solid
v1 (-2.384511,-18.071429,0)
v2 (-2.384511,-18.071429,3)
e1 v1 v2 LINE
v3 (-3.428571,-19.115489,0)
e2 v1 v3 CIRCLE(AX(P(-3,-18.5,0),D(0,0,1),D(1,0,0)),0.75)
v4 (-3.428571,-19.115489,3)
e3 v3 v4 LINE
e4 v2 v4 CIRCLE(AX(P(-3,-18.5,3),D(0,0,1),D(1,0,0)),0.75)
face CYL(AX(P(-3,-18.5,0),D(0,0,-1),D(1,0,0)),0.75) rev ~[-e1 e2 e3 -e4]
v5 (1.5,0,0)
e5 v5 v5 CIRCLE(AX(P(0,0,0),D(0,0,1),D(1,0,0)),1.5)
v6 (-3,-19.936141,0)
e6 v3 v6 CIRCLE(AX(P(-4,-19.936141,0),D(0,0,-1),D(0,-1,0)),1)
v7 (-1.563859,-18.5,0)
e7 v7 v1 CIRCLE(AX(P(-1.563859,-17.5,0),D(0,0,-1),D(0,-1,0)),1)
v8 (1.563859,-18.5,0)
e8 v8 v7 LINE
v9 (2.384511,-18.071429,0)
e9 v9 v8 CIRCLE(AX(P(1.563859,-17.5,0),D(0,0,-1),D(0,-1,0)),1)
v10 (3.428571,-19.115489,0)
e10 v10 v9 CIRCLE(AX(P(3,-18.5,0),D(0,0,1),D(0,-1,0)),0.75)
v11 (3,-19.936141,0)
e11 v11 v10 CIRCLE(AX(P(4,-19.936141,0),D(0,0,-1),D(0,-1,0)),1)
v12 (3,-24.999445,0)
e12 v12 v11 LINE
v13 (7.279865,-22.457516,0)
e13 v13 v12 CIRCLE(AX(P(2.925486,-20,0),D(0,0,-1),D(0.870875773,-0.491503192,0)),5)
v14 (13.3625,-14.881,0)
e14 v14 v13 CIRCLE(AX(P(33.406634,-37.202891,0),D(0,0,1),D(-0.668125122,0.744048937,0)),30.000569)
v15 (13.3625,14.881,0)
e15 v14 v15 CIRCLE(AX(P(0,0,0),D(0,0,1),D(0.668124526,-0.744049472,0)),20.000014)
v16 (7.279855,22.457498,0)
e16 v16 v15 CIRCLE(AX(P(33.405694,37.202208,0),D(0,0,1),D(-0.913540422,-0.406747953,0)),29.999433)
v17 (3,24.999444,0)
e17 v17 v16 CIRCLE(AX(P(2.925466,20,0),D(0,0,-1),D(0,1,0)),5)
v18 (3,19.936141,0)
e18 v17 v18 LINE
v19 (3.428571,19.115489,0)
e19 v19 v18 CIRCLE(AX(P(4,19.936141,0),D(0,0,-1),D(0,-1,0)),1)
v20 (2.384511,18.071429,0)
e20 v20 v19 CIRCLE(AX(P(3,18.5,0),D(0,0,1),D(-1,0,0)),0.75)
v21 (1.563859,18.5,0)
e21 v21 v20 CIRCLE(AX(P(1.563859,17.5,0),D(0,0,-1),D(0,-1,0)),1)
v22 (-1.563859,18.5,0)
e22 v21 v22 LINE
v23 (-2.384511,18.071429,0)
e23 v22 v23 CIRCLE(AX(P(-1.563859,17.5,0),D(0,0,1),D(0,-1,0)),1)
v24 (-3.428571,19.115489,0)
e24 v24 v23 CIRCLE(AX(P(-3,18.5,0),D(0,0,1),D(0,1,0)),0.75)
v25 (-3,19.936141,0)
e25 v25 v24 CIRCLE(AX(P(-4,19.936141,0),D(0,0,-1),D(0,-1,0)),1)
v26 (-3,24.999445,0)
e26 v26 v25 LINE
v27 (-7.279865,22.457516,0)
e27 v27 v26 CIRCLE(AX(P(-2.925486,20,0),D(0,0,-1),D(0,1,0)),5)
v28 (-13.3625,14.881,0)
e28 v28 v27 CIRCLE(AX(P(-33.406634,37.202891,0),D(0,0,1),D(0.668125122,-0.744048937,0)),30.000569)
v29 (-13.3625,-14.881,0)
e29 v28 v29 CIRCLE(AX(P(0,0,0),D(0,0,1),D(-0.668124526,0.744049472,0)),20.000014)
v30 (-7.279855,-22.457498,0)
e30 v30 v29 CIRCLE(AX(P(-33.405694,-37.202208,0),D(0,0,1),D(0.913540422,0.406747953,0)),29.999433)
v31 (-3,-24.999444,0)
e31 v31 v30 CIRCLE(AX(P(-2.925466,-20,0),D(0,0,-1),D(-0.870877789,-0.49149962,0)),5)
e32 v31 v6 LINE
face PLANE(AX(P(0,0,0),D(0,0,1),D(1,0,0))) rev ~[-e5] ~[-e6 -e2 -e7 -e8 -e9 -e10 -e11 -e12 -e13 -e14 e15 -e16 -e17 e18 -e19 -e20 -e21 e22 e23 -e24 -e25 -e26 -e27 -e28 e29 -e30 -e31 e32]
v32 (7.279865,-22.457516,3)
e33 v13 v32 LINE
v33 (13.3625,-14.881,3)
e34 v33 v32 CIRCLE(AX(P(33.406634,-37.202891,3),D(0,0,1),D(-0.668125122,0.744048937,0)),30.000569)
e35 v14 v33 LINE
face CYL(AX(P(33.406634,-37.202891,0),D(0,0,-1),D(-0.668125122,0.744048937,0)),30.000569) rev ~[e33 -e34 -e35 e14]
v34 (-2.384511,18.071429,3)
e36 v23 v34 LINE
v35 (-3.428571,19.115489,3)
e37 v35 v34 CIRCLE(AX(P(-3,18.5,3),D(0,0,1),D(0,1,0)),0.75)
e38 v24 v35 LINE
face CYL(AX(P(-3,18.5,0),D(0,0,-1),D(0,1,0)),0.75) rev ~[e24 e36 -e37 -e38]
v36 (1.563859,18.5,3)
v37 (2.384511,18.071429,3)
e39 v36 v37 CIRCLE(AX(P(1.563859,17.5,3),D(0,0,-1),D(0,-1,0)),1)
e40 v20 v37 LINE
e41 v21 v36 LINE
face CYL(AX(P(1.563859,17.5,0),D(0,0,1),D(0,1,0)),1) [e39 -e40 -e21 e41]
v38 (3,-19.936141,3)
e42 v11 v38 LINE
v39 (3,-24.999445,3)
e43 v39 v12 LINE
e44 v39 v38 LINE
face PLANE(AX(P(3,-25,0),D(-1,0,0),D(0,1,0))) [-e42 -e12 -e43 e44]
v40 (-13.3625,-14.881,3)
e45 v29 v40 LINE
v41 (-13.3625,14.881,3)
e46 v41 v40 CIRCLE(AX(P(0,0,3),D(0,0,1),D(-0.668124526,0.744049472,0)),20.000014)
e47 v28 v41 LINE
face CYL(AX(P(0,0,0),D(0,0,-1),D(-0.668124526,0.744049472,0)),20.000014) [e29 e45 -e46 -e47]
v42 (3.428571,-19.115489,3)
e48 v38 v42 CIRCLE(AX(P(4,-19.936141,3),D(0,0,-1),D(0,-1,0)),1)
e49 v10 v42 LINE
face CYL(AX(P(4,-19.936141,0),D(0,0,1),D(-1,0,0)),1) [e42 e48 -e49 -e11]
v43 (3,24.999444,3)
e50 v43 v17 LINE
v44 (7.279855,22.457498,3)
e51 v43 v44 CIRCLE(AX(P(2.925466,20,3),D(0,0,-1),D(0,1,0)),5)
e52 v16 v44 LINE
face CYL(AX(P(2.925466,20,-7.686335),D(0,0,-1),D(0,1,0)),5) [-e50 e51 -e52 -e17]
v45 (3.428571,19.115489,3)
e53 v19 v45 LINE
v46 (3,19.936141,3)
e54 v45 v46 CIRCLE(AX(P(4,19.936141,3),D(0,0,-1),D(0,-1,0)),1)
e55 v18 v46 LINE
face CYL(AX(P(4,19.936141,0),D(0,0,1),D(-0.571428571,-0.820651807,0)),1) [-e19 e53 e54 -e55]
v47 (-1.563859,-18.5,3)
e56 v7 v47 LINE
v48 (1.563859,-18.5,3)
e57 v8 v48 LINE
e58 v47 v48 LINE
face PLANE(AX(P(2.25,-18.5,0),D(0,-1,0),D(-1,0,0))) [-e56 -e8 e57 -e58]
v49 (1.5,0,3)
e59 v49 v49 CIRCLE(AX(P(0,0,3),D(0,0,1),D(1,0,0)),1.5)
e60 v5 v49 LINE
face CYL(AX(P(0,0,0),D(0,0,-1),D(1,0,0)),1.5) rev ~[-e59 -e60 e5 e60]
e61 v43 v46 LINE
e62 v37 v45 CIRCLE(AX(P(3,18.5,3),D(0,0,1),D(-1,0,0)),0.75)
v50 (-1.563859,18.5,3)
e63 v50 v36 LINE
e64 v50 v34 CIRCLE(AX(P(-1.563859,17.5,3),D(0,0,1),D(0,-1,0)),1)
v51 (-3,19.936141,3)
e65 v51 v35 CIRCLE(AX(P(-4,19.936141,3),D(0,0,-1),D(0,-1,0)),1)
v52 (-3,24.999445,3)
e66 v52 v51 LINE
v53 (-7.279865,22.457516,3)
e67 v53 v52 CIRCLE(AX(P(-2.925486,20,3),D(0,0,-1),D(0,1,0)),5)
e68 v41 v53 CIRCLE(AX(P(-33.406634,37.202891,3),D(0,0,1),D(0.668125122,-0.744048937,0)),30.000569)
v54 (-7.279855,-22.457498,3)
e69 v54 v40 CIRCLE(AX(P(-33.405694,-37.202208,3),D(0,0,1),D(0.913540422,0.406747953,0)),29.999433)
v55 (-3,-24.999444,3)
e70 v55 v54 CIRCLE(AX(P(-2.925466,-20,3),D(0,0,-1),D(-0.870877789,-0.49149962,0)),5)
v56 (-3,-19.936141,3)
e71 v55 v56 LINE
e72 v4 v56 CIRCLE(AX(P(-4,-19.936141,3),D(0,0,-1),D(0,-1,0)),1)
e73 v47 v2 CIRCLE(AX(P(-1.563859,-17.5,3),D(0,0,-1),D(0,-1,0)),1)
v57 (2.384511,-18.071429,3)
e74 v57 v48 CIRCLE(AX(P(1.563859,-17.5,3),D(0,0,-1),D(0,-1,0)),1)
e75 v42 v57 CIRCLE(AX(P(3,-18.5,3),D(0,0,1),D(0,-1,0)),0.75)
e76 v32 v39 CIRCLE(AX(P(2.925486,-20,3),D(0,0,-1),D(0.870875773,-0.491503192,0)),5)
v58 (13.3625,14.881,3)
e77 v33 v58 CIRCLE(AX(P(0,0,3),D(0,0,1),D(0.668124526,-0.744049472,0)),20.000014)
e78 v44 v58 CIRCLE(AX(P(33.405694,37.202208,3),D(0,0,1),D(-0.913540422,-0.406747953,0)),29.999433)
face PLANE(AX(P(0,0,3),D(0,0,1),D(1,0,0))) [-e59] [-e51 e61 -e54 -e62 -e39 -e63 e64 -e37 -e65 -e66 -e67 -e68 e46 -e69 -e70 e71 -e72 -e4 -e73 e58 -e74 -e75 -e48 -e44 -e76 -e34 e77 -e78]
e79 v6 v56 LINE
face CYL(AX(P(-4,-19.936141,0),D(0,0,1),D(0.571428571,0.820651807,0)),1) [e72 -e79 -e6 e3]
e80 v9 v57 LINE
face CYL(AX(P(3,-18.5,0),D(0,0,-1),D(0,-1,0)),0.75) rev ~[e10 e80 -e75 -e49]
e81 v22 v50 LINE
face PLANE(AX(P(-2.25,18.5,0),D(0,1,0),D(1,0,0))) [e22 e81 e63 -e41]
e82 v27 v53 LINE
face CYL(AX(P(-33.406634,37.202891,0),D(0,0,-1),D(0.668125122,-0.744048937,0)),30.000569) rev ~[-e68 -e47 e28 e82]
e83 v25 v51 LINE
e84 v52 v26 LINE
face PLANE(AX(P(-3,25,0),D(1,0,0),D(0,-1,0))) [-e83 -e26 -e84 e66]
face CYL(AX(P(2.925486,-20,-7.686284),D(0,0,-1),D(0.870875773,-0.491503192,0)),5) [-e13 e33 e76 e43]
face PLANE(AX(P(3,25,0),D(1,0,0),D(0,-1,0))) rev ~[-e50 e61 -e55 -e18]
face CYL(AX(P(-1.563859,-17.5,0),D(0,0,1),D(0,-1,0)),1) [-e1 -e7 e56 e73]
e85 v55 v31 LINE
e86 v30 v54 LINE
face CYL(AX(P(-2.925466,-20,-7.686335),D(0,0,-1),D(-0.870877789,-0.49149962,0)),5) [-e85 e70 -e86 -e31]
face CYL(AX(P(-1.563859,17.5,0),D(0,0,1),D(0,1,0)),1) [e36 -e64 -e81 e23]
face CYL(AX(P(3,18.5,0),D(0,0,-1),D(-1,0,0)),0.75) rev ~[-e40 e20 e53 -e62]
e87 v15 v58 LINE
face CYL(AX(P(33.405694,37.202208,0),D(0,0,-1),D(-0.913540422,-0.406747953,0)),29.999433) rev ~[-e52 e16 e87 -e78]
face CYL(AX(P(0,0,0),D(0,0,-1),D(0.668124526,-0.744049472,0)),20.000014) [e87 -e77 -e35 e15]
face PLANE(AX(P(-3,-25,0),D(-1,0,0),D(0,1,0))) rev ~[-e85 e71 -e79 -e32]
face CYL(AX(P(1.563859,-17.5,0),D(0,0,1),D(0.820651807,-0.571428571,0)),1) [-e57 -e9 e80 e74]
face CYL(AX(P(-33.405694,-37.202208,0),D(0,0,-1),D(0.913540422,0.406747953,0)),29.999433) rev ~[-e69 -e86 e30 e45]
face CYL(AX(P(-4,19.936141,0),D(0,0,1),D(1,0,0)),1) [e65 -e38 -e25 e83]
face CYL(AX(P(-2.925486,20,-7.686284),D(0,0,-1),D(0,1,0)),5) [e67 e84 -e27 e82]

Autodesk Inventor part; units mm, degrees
ref_plane "YZ Plane" through (0, 0, 0) normal (1, 0, 0) x (0, 1, 0)
ref_plane "XZ Plane" through (0, 0, 0) normal (0, 1, 0) x (-1, 0, 0)
ref_plane "XY Plane" through (0, 0, 0) normal (0, 0, 1) x (1, 0, 0)
sketch "Sketch1" plane through (0, 0, 0) normal (0, 0, 1) x (1, 0, 0)
  circle A0 centre (0, 0) radius 1.5
  circle A1 centre (0, 0) radius 15.875 construction
  line L0 (0, 20) -> (0, -20) construction
  line L1 (-20, 0) -> (20, 0) construction
  line L2 (-2.25, 18.5) -> (0, 18.5)
  line L3 (-6, 25) -> (-3, 25)
  line L4 (-3, 25) -> (-3, 19.25)
  line L5 (2.25, 18.5) -> (0, 18.5)
  line L6 (6, 25) -> (3, 25)
  line L7 (3, 25) -> (3, 19.25)
  line L8 (-2.25, -18.5) -> (0, -18.5)
  line L9 (-6, -25) -> (-3, -25)
  line L10 (-3, -25) -> (-3, -19.25)
  line L11 (2.25, -18.5) -> (0, -18.5)
  line L12 (3, -25) -> (3, -19.25)
  line L13 (6, -25) -> (3, -25)
  arc A2 (-13.3625, 14.881) -> (-13.3625, -14.881) centre (0, 0) ccw
  arc A3 (13.3625, -14.881) -> (13.3625, 14.881) centre (0, 0) ccw
  circle A4 centre (0, 0) radius 20 construction
  arc A5 (-3, 19.25) -> (-2.25, 18.5) centre (-3, 18.5) ccw
  arc A6 (2.25, 18.5) -> (3, 19.25) centre (3, 18.5) ccw
  arc A7 (-2.25, -18.5) -> (-3, -19.25) centre (-3, -18.5) ccw
  arc A8 (3, -19.25) -> (2.25, -18.5) centre (3, -18.5) ccw
  arc A9 (-13.3625, 14.881) -> (-6, 25) centre (-33.4062, 37.2025) ccw
  arc A10 (6, 25) -> (13.3625, 14.881) centre (33.4062, 37.2025) ccw
  arc A11 (-6, -25) -> (-13.3625, -14.881) centre (-33.4062, -37.2025) ccw
  arc A12 (13.3625, -14.881) -> (6, -25) centre (33.4062, -37.2025) ccw
  dimension "d9" = 40
  dimension "d0" = 3
  dimension "d1" = 31.75
  dimension "GripLength" = 1.5
  dimension "d4" = 5
  dimension "d5" = 3
  dimension "d6" = 3
  dimension "d8" = 20
  dimension "d10" = 0.75
  dimension "d15" = 30
extrude "Extrusion1" add sketch "Sketch1" along normal blind 3
fillet "Fillet1" radius 1 8 edges at (-3, 19.25, 1.5) (-2.25, 18.5, 1.5) (2.25, 18.5, 1.5) (3, 19.25, 1.5) (-3, -19.25, 1.5) (-2.25, -18.5, 1.5) (2.25, -18.5, 1.5) (3, -19.25, 1.5)
fillet "Fillet2" radius 5 8 edges at (-13.3625, -14.881, 1.5) (-6, -25, 1.5) (6, -25, 1.5) (13.3625, -14.881, 1.5) (13.3625, 14.881, 1.5) (6, 25, 1.5) (-6, 25, 1.5) (-13.3625, 14.881, 1.5)
equation "\"d1\" = BattOD"
equation "\"BattOD\" = 31.75"
properties part number "Forward Endcap Outer"
